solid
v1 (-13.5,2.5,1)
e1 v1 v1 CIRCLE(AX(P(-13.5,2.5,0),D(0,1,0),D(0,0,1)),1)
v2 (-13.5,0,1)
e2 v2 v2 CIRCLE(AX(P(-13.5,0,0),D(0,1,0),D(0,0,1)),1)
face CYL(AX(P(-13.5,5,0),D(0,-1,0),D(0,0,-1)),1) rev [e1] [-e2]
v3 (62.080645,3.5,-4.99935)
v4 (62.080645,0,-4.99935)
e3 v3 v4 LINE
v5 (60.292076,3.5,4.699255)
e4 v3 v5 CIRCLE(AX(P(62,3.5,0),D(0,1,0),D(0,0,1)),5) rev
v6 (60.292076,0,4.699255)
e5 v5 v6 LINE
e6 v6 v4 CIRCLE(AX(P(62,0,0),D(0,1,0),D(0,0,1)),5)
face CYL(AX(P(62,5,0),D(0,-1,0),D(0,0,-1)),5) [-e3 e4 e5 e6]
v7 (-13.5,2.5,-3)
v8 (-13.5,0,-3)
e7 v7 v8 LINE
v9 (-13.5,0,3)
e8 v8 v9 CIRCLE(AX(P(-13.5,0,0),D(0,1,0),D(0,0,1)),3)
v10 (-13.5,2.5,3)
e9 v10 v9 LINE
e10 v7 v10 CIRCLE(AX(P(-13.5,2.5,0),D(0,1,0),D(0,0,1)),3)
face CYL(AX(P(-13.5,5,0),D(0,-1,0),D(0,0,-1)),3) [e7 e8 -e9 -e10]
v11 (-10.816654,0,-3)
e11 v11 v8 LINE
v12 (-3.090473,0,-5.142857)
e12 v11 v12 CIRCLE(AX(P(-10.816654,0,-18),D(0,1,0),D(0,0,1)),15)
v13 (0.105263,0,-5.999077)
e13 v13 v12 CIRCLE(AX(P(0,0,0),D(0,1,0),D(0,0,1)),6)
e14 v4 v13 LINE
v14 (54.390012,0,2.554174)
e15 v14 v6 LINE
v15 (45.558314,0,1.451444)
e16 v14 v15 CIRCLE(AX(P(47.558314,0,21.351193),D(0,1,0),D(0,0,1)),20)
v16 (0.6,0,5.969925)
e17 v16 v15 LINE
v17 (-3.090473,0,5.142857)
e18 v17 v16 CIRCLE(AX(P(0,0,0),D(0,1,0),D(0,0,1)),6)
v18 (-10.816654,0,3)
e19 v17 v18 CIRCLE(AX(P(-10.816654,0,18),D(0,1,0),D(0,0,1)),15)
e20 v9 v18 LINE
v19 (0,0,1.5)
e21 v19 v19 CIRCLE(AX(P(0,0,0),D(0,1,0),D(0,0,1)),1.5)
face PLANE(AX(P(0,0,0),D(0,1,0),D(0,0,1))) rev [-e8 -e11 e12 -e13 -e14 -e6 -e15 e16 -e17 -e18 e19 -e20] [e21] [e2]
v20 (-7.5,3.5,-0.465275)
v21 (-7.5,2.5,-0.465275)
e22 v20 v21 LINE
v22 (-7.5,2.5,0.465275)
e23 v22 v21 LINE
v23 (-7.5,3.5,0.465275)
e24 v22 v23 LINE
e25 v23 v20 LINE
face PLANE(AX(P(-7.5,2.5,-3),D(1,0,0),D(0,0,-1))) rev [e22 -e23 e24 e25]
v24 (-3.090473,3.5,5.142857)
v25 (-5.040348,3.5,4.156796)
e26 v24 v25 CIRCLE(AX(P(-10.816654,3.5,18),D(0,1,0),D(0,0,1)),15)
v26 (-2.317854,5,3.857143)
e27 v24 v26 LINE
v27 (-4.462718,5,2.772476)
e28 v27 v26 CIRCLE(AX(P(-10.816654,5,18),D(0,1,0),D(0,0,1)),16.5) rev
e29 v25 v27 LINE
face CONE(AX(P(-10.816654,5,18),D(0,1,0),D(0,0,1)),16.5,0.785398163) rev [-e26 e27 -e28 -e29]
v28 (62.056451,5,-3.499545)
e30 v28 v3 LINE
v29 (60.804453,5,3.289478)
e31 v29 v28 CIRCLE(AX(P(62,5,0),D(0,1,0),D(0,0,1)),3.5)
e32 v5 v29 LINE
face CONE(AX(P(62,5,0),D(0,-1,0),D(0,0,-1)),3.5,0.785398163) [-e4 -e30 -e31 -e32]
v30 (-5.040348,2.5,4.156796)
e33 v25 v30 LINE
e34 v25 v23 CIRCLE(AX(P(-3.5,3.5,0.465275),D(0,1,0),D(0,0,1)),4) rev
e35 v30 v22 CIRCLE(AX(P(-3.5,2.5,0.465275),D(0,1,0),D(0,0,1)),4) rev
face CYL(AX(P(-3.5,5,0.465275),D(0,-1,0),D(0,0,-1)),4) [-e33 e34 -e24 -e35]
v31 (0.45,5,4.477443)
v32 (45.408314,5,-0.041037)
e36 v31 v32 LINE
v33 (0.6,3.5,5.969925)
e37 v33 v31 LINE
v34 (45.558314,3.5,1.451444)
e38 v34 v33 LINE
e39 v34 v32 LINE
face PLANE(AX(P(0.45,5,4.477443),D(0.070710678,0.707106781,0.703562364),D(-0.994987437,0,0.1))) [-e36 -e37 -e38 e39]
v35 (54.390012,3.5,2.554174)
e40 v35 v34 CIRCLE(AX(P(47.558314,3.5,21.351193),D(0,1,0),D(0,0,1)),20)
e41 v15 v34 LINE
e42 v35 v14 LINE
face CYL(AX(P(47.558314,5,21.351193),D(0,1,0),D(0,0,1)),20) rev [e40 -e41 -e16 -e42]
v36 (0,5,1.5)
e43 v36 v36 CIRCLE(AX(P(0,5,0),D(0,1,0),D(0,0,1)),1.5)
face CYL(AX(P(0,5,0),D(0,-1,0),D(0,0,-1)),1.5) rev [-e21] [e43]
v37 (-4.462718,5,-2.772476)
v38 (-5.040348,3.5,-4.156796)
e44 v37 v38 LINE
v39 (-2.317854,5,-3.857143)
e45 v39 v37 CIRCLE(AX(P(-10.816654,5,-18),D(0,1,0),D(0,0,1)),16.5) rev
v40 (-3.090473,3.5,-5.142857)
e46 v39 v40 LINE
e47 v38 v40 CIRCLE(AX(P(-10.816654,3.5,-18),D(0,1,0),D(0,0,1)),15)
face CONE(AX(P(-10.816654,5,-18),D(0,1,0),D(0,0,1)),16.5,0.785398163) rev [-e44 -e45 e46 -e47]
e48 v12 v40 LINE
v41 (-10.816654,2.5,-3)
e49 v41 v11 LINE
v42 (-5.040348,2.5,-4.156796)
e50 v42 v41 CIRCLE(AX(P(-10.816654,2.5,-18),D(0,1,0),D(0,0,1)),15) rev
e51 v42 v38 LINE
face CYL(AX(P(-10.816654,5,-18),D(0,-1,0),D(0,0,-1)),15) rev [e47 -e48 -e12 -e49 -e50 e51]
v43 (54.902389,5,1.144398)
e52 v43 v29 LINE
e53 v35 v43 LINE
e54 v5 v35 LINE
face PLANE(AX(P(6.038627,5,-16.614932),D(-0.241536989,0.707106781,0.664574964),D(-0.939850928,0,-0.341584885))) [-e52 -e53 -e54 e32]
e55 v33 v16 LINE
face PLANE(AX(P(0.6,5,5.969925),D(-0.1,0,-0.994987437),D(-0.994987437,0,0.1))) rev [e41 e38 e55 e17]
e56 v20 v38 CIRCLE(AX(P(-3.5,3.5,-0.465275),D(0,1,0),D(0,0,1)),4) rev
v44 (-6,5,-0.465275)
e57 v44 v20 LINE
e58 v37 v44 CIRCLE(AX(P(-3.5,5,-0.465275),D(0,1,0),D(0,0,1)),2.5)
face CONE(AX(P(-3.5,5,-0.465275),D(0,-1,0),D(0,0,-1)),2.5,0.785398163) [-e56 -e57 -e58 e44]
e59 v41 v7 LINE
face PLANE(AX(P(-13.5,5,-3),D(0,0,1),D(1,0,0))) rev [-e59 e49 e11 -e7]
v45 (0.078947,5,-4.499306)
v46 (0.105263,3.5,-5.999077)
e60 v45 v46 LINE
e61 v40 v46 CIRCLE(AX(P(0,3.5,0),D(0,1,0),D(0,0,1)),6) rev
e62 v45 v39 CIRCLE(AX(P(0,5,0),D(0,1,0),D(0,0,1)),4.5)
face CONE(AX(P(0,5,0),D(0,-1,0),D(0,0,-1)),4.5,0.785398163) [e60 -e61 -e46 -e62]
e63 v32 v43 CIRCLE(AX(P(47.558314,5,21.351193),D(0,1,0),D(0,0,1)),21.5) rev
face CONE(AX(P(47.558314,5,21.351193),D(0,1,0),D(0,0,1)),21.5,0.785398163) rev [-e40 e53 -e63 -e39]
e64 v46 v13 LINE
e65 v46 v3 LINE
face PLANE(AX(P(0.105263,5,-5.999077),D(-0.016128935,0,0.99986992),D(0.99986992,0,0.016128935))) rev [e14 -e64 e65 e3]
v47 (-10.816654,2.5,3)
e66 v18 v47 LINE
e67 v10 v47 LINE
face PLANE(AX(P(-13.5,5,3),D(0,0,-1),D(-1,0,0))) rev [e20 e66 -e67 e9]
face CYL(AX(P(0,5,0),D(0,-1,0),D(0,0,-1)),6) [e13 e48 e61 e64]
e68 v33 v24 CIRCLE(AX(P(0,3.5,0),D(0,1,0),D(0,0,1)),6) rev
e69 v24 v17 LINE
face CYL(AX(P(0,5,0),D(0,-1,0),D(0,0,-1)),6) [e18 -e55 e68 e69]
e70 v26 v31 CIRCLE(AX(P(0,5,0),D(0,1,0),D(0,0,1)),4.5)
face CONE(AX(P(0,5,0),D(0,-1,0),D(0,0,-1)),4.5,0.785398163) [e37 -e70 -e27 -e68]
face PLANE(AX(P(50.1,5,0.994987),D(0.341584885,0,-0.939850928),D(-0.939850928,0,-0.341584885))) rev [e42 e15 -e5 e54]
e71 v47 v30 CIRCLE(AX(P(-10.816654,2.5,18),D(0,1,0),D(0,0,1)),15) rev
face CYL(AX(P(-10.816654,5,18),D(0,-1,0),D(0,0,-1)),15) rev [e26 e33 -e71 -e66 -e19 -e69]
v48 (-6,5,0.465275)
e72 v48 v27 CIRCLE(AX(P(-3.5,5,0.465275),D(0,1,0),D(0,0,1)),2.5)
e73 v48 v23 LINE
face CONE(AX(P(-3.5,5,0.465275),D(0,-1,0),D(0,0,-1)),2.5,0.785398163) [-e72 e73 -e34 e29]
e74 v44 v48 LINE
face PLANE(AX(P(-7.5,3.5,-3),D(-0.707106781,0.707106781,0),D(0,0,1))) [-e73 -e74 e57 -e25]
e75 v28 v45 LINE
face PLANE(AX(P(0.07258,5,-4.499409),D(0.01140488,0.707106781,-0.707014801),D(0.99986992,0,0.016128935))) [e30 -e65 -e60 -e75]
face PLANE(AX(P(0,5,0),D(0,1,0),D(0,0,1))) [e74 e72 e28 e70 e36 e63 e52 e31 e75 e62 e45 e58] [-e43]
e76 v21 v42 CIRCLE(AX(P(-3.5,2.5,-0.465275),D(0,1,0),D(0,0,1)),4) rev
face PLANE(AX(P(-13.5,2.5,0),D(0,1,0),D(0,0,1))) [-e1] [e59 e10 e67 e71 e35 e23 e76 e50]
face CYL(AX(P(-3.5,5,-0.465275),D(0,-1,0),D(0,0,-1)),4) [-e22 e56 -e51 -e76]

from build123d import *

# Parameters (mm, degrees)
SKETCH1_R           = 1.5
SKETCH1_R_2         = 1
BOSS_EXTRUDE1_DEPTH = 5
FILLET1_R           = 20
CUT_EXTRUDE1_START  = -2.5
CUT_EXTRUDE1_DEPTH  = 2.5
FILLET5_R           = 15
FILLET6_R           = 4
CHAMFER1_SIZE       = 1.5


with BuildPart() as part:
    # Sketch1 → Boss-Extrude1 (new body)
    with BuildSketch(Plane(origin=(0, 0, 0), x_dir=(1, 0, 0), z_dir=(0, 1, 0))):
        with BuildLine():
            Line((0.6, -5.969924623), (50.1, -0.994987437))
            Line((50.1, -0.994987437), (60.292075574, -4.699254638))
            ThreePointArc((60.292075574, -4.699254638), (66.917086627, -0.906785038), (62.080644677, 4.999349601))
            Line((62.080644677, 4.999349601), (0.105263158, 5.999076568))
            ThreePointArc((0.105263158, 5.999076568), (-2.95430253, 5.222269292), (-5.196152423, 3))
            Line((-5.196152423, 3), (-13.5, 3))
            ThreePointArc((-13.5, 3), (-16.5, 0), (-13.5, -3))
            Line((-13.5, -3), (-5.196152423, -3))
            ThreePointArc((-5.196152423, -3), (-2.736104409, -5.339825153), (0.6, -5.969924623))
        make_face()
        with Locations(Location((0, 0, 0), (0, 0, 270))):
            Circle(SKETCH1_R, mode=Mode.SUBTRACT)
        with Locations(Location((-13.5, 0, 0), (0, 0, 270))):
            Circle(SKETCH1_R_2, mode=Mode.SUBTRACT)
    extrude(amount=BOSS_EXTRUDE1_DEPTH)

    # Fillet1
    fillet1_edges = [part.edges().sort_by_distance(p)[0] for p in [
        (50.1, 2.5, 0.994987437),
    ]]
    fillet(fillet1_edges, radius=FILLET1_R)

    # Sketch2 → Cut-Extrude1 (cut)
    with BuildSketch(Plane(origin=(0, 5, 0), x_dir=(1, 0, 0), z_dir=(0, 1, 0)).offset(CUT_EXTRUDE1_START)):
        with BuildLine():
            Line((-13.5, 3), (-7.5, 3))
            Line((-7.5, 3), (-7.5, -3))
            Line((-7.5, -3), (-13.5, -3))
            ThreePointArc((-13.5, -3), (-16.5, 0), (-13.5, 3))
        make_face()
    extrude(amount=CUT_EXTRUDE1_DEPTH, mode=Mode.SUBTRACT)

    # Fillet5
    # the kernel refuses this fillet: 15 mm, written as the material it adds along each edge
    with BuildSketch(Plane(origin=(-5.196152423, 0, 3), x_dir=(0.7008923394400669, 0, 0.7132670807728548), z_dir=(0, 1, 0))) as fillet5_piece_1_section:
        with BuildLine():
            CenterArc((6.759639834, -14.52230372), FILLET5_R, 104.498640433, 31.002719134)
            Line((-3.939366378, -4.008918629), (0, 0))
            ThreePointArc((0, 0), (1.502142185, -0.191078512), (3.004284371, 0))
        make_face()
    fillet5_piece_1 = extrude(amount=5, mode=Mode.PRIVATE)
    fillet5_piece_1 = split(fillet5_piece_1, bisect_by=Plane(origin=(-7.5, 1.25, 3.544303671), z_dir=(1, 0, 0)), keep=Keep.TOP, mode=Mode.PRIVATE)
    fillet5_piece_1 = split(fillet5_piece_1, bisect_by=Plane(origin=(-5.459248891, 2.5, 3.544303671), z_dir=(0, -1, 0)), keep=Keep.TOP, mode=Mode.PRIVATE)
    add(fillet5_piece_1)
    with BuildSketch(Plane(origin=(-5.196152423, 0, 3), x_dir=(0.7008923394400669, 0, 0.7132670807728548), z_dir=(0, 1, 0))) as fillet5_piece_2_section:
        with BuildLine():
            CenterArc((6.759639834, -14.52230372), FILLET5_R, 104.498640433, 31.002719134)
            Line((-3.939366378, -4.008918629), (0, 0))
            ThreePointArc((0, 0), (1.502142185, -0.191078512), (3.004284371, 0))
        make_face()
    fillet5_piece_2 = extrude(amount=5, mode=Mode.PRIVATE)
    fillet5_piece_2 = split(fillet5_piece_2, bisect_by=Plane(origin=(-7.5, 1.25, 2.925994162), z_dir=(-1, 0, 0)), keep=Keep.TOP, mode=Mode.PRIVATE)
    fillet5_piece_2 = split(fillet5_piece_2, bisect_by=Plane(origin=(-8.916431377, 2.5, 2.925994162), z_dir=(0, -1, 0)), keep=Keep.TOP, mode=Mode.PRIVATE)
    add(fillet5_piece_2)
    with BuildSketch(Plane(origin=(-5.196152423, 0, 3), x_dir=(0.7008923394400669, 0, 0.7132670807728548), z_dir=(0, 1, 0))) as fillet5_piece_3_section:
        with BuildLine():
            CenterArc((6.759639834, -14.52230372), FILLET5_R, 104.498640433, 31.002719134)
            Line((-3.939366378, -4.008918629), (0, 0))
            ThreePointArc((0, 0), (1.502142185, -0.191078512), (3.004284371, 0))
        make_face()
    fillet5_piece_3 = extrude(amount=5, mode=Mode.PRIVATE)
    fillet5_piece_3 = split(fillet5_piece_3, bisect_by=Plane(origin=(-7.5, 3.75, 3.544303671), z_dir=(1, 0, 0)), keep=Keep.TOP, mode=Mode.PRIVATE)
    fillet5_piece_3 = split(fillet5_piece_3, bisect_by=Plane(origin=(-5.459248891, 2.5, 3.544303671), z_dir=(0, 1, 0)), keep=Keep.TOP, mode=Mode.PRIVATE)
    add(fillet5_piece_3)
    with BuildSketch(Plane(origin=(-5.196152423, 0, -3), x_dir=(-1, 0, 0), z_dir=(0, 1, 0))) as fillet5_piece_4_section:
        with BuildLine():
            CenterArc((5.620501404, -15), FILLET5_R, 90, 31.002719134)
            ThreePointArc((-2.105679901, -2.142857143), (-0.916549938, -1.205354037), (0, 0))
            Line((0, 0), (5.620501404, 0))
        make_face()
    fillet5_piece_4 = extrude(amount=5, mode=Mode.PRIVATE)
    fillet5_piece_4 = split(fillet5_piece_4, bisect_by=Plane(origin=(-8.916431377, 2.5, -2.925994162), z_dir=(0, -1, 0)), keep=Keep.TOP, mode=Mode.PRIVATE)
    fillet5_piece_4 = split(fillet5_piece_4, bisect_by=Plane(origin=(-7.5, 1.25, -2.925994162), z_dir=(-1, 0, 0)), keep=Keep.TOP, mode=Mode.PRIVATE)
    add(fillet5_piece_4)
    with BuildSketch(Plane(origin=(-5.196152423, 0, -3), x_dir=(-1, 0, 0), z_dir=(0, 1, 0))) as fillet5_piece_5_section:
        with BuildLine():
            CenterArc((5.620501404, -15), FILLET5_R, 90, 31.002719134)
            ThreePointArc((-2.105679901, -2.142857143), (-0.916549938, -1.205354037), (0, 0))
            Line((0, 0), (5.620501404, 0))
        make_face()
    fillet5_piece_5 = extrude(amount=5, mode=Mode.PRIVATE)
    fillet5_piece_5 = split(fillet5_piece_5, bisect_by=Plane(origin=(-5.459248891, 2.5, -3.544303671), z_dir=(0, -1, 0)), keep=Keep.TOP, mode=Mode.PRIVATE)
    fillet5_piece_5 = split(fillet5_piece_5, bisect_by=Plane(origin=(-7.5, 1.25, -3.544303671), z_dir=(1, 0, 0)), keep=Keep.TOP, mode=Mode.PRIVATE)
    add(fillet5_piece_5)
    with BuildSketch(Plane(origin=(-5.196152423, 0, -3), x_dir=(-1, 0, 0), z_dir=(0, 1, 0))) as fillet5_piece_6_section:
        with BuildLine():
            CenterArc((5.620501404, -15), FILLET5_R, 90, 31.002719134)
            ThreePointArc((-2.105679901, -2.142857143), (-0.916549938, -1.205354037), (0, 0))
            Line((0, 0), (5.620501404, 0))
        make_face()
    fillet5_piece_6 = extrude(amount=5, mode=Mode.PRIVATE)
    fillet5_piece_6 = split(fillet5_piece_6, bisect_by=Plane(origin=(-5.459248891, 2.5, -3.544303671), z_dir=(0, 1, 0)), keep=Keep.TOP, mode=Mode.PRIVATE)
    fillet5_piece_6 = split(fillet5_piece_6, bisect_by=Plane(origin=(-7.5, 3.75, -3.544303671), z_dir=(1, 0, 0)), keep=Keep.TOP, mode=Mode.PRIVATE)
    add(fillet5_piece_6)

    # Fillet6
    fillet6_edges = [part.edges().sort_by_distance(p)[0] for p in [
        (-7.5, 3.75, 3.371267745),
        (-7.5, 3.75, -3.371267745),
    ]]
    fillet(fillet6_edges, radius=FILLET6_R)

    # Chamfer1
    chamfer1_edges = [part.edges().sort_by_distance(p)[0] for p in [
        (-4.047431746, 5, -4.614275051),
        (-6.828767993, 5, -2.683225442),
        (-7.5, 5, 0),
        (-6.828767993, 5, 2.683225442),
        (-4.047431746, 5, 4.614275051),
        (-1.312106512, 5, 5.854773821),
        (23.079157013, 5, 3.710684337),
        (50.036282779, 5, 1.505294708),
        (57.341043652, 5, 3.62671444),
        (66.917086627, 5, 0.906785038),
        (31.092953917, 5, -5.499213085),
        (-1.552786741, 5, -5.795589128),
    ]]
    chamfer(chamfer1_edges, length=CHAMFER1_SIZE)


solid = part.part
